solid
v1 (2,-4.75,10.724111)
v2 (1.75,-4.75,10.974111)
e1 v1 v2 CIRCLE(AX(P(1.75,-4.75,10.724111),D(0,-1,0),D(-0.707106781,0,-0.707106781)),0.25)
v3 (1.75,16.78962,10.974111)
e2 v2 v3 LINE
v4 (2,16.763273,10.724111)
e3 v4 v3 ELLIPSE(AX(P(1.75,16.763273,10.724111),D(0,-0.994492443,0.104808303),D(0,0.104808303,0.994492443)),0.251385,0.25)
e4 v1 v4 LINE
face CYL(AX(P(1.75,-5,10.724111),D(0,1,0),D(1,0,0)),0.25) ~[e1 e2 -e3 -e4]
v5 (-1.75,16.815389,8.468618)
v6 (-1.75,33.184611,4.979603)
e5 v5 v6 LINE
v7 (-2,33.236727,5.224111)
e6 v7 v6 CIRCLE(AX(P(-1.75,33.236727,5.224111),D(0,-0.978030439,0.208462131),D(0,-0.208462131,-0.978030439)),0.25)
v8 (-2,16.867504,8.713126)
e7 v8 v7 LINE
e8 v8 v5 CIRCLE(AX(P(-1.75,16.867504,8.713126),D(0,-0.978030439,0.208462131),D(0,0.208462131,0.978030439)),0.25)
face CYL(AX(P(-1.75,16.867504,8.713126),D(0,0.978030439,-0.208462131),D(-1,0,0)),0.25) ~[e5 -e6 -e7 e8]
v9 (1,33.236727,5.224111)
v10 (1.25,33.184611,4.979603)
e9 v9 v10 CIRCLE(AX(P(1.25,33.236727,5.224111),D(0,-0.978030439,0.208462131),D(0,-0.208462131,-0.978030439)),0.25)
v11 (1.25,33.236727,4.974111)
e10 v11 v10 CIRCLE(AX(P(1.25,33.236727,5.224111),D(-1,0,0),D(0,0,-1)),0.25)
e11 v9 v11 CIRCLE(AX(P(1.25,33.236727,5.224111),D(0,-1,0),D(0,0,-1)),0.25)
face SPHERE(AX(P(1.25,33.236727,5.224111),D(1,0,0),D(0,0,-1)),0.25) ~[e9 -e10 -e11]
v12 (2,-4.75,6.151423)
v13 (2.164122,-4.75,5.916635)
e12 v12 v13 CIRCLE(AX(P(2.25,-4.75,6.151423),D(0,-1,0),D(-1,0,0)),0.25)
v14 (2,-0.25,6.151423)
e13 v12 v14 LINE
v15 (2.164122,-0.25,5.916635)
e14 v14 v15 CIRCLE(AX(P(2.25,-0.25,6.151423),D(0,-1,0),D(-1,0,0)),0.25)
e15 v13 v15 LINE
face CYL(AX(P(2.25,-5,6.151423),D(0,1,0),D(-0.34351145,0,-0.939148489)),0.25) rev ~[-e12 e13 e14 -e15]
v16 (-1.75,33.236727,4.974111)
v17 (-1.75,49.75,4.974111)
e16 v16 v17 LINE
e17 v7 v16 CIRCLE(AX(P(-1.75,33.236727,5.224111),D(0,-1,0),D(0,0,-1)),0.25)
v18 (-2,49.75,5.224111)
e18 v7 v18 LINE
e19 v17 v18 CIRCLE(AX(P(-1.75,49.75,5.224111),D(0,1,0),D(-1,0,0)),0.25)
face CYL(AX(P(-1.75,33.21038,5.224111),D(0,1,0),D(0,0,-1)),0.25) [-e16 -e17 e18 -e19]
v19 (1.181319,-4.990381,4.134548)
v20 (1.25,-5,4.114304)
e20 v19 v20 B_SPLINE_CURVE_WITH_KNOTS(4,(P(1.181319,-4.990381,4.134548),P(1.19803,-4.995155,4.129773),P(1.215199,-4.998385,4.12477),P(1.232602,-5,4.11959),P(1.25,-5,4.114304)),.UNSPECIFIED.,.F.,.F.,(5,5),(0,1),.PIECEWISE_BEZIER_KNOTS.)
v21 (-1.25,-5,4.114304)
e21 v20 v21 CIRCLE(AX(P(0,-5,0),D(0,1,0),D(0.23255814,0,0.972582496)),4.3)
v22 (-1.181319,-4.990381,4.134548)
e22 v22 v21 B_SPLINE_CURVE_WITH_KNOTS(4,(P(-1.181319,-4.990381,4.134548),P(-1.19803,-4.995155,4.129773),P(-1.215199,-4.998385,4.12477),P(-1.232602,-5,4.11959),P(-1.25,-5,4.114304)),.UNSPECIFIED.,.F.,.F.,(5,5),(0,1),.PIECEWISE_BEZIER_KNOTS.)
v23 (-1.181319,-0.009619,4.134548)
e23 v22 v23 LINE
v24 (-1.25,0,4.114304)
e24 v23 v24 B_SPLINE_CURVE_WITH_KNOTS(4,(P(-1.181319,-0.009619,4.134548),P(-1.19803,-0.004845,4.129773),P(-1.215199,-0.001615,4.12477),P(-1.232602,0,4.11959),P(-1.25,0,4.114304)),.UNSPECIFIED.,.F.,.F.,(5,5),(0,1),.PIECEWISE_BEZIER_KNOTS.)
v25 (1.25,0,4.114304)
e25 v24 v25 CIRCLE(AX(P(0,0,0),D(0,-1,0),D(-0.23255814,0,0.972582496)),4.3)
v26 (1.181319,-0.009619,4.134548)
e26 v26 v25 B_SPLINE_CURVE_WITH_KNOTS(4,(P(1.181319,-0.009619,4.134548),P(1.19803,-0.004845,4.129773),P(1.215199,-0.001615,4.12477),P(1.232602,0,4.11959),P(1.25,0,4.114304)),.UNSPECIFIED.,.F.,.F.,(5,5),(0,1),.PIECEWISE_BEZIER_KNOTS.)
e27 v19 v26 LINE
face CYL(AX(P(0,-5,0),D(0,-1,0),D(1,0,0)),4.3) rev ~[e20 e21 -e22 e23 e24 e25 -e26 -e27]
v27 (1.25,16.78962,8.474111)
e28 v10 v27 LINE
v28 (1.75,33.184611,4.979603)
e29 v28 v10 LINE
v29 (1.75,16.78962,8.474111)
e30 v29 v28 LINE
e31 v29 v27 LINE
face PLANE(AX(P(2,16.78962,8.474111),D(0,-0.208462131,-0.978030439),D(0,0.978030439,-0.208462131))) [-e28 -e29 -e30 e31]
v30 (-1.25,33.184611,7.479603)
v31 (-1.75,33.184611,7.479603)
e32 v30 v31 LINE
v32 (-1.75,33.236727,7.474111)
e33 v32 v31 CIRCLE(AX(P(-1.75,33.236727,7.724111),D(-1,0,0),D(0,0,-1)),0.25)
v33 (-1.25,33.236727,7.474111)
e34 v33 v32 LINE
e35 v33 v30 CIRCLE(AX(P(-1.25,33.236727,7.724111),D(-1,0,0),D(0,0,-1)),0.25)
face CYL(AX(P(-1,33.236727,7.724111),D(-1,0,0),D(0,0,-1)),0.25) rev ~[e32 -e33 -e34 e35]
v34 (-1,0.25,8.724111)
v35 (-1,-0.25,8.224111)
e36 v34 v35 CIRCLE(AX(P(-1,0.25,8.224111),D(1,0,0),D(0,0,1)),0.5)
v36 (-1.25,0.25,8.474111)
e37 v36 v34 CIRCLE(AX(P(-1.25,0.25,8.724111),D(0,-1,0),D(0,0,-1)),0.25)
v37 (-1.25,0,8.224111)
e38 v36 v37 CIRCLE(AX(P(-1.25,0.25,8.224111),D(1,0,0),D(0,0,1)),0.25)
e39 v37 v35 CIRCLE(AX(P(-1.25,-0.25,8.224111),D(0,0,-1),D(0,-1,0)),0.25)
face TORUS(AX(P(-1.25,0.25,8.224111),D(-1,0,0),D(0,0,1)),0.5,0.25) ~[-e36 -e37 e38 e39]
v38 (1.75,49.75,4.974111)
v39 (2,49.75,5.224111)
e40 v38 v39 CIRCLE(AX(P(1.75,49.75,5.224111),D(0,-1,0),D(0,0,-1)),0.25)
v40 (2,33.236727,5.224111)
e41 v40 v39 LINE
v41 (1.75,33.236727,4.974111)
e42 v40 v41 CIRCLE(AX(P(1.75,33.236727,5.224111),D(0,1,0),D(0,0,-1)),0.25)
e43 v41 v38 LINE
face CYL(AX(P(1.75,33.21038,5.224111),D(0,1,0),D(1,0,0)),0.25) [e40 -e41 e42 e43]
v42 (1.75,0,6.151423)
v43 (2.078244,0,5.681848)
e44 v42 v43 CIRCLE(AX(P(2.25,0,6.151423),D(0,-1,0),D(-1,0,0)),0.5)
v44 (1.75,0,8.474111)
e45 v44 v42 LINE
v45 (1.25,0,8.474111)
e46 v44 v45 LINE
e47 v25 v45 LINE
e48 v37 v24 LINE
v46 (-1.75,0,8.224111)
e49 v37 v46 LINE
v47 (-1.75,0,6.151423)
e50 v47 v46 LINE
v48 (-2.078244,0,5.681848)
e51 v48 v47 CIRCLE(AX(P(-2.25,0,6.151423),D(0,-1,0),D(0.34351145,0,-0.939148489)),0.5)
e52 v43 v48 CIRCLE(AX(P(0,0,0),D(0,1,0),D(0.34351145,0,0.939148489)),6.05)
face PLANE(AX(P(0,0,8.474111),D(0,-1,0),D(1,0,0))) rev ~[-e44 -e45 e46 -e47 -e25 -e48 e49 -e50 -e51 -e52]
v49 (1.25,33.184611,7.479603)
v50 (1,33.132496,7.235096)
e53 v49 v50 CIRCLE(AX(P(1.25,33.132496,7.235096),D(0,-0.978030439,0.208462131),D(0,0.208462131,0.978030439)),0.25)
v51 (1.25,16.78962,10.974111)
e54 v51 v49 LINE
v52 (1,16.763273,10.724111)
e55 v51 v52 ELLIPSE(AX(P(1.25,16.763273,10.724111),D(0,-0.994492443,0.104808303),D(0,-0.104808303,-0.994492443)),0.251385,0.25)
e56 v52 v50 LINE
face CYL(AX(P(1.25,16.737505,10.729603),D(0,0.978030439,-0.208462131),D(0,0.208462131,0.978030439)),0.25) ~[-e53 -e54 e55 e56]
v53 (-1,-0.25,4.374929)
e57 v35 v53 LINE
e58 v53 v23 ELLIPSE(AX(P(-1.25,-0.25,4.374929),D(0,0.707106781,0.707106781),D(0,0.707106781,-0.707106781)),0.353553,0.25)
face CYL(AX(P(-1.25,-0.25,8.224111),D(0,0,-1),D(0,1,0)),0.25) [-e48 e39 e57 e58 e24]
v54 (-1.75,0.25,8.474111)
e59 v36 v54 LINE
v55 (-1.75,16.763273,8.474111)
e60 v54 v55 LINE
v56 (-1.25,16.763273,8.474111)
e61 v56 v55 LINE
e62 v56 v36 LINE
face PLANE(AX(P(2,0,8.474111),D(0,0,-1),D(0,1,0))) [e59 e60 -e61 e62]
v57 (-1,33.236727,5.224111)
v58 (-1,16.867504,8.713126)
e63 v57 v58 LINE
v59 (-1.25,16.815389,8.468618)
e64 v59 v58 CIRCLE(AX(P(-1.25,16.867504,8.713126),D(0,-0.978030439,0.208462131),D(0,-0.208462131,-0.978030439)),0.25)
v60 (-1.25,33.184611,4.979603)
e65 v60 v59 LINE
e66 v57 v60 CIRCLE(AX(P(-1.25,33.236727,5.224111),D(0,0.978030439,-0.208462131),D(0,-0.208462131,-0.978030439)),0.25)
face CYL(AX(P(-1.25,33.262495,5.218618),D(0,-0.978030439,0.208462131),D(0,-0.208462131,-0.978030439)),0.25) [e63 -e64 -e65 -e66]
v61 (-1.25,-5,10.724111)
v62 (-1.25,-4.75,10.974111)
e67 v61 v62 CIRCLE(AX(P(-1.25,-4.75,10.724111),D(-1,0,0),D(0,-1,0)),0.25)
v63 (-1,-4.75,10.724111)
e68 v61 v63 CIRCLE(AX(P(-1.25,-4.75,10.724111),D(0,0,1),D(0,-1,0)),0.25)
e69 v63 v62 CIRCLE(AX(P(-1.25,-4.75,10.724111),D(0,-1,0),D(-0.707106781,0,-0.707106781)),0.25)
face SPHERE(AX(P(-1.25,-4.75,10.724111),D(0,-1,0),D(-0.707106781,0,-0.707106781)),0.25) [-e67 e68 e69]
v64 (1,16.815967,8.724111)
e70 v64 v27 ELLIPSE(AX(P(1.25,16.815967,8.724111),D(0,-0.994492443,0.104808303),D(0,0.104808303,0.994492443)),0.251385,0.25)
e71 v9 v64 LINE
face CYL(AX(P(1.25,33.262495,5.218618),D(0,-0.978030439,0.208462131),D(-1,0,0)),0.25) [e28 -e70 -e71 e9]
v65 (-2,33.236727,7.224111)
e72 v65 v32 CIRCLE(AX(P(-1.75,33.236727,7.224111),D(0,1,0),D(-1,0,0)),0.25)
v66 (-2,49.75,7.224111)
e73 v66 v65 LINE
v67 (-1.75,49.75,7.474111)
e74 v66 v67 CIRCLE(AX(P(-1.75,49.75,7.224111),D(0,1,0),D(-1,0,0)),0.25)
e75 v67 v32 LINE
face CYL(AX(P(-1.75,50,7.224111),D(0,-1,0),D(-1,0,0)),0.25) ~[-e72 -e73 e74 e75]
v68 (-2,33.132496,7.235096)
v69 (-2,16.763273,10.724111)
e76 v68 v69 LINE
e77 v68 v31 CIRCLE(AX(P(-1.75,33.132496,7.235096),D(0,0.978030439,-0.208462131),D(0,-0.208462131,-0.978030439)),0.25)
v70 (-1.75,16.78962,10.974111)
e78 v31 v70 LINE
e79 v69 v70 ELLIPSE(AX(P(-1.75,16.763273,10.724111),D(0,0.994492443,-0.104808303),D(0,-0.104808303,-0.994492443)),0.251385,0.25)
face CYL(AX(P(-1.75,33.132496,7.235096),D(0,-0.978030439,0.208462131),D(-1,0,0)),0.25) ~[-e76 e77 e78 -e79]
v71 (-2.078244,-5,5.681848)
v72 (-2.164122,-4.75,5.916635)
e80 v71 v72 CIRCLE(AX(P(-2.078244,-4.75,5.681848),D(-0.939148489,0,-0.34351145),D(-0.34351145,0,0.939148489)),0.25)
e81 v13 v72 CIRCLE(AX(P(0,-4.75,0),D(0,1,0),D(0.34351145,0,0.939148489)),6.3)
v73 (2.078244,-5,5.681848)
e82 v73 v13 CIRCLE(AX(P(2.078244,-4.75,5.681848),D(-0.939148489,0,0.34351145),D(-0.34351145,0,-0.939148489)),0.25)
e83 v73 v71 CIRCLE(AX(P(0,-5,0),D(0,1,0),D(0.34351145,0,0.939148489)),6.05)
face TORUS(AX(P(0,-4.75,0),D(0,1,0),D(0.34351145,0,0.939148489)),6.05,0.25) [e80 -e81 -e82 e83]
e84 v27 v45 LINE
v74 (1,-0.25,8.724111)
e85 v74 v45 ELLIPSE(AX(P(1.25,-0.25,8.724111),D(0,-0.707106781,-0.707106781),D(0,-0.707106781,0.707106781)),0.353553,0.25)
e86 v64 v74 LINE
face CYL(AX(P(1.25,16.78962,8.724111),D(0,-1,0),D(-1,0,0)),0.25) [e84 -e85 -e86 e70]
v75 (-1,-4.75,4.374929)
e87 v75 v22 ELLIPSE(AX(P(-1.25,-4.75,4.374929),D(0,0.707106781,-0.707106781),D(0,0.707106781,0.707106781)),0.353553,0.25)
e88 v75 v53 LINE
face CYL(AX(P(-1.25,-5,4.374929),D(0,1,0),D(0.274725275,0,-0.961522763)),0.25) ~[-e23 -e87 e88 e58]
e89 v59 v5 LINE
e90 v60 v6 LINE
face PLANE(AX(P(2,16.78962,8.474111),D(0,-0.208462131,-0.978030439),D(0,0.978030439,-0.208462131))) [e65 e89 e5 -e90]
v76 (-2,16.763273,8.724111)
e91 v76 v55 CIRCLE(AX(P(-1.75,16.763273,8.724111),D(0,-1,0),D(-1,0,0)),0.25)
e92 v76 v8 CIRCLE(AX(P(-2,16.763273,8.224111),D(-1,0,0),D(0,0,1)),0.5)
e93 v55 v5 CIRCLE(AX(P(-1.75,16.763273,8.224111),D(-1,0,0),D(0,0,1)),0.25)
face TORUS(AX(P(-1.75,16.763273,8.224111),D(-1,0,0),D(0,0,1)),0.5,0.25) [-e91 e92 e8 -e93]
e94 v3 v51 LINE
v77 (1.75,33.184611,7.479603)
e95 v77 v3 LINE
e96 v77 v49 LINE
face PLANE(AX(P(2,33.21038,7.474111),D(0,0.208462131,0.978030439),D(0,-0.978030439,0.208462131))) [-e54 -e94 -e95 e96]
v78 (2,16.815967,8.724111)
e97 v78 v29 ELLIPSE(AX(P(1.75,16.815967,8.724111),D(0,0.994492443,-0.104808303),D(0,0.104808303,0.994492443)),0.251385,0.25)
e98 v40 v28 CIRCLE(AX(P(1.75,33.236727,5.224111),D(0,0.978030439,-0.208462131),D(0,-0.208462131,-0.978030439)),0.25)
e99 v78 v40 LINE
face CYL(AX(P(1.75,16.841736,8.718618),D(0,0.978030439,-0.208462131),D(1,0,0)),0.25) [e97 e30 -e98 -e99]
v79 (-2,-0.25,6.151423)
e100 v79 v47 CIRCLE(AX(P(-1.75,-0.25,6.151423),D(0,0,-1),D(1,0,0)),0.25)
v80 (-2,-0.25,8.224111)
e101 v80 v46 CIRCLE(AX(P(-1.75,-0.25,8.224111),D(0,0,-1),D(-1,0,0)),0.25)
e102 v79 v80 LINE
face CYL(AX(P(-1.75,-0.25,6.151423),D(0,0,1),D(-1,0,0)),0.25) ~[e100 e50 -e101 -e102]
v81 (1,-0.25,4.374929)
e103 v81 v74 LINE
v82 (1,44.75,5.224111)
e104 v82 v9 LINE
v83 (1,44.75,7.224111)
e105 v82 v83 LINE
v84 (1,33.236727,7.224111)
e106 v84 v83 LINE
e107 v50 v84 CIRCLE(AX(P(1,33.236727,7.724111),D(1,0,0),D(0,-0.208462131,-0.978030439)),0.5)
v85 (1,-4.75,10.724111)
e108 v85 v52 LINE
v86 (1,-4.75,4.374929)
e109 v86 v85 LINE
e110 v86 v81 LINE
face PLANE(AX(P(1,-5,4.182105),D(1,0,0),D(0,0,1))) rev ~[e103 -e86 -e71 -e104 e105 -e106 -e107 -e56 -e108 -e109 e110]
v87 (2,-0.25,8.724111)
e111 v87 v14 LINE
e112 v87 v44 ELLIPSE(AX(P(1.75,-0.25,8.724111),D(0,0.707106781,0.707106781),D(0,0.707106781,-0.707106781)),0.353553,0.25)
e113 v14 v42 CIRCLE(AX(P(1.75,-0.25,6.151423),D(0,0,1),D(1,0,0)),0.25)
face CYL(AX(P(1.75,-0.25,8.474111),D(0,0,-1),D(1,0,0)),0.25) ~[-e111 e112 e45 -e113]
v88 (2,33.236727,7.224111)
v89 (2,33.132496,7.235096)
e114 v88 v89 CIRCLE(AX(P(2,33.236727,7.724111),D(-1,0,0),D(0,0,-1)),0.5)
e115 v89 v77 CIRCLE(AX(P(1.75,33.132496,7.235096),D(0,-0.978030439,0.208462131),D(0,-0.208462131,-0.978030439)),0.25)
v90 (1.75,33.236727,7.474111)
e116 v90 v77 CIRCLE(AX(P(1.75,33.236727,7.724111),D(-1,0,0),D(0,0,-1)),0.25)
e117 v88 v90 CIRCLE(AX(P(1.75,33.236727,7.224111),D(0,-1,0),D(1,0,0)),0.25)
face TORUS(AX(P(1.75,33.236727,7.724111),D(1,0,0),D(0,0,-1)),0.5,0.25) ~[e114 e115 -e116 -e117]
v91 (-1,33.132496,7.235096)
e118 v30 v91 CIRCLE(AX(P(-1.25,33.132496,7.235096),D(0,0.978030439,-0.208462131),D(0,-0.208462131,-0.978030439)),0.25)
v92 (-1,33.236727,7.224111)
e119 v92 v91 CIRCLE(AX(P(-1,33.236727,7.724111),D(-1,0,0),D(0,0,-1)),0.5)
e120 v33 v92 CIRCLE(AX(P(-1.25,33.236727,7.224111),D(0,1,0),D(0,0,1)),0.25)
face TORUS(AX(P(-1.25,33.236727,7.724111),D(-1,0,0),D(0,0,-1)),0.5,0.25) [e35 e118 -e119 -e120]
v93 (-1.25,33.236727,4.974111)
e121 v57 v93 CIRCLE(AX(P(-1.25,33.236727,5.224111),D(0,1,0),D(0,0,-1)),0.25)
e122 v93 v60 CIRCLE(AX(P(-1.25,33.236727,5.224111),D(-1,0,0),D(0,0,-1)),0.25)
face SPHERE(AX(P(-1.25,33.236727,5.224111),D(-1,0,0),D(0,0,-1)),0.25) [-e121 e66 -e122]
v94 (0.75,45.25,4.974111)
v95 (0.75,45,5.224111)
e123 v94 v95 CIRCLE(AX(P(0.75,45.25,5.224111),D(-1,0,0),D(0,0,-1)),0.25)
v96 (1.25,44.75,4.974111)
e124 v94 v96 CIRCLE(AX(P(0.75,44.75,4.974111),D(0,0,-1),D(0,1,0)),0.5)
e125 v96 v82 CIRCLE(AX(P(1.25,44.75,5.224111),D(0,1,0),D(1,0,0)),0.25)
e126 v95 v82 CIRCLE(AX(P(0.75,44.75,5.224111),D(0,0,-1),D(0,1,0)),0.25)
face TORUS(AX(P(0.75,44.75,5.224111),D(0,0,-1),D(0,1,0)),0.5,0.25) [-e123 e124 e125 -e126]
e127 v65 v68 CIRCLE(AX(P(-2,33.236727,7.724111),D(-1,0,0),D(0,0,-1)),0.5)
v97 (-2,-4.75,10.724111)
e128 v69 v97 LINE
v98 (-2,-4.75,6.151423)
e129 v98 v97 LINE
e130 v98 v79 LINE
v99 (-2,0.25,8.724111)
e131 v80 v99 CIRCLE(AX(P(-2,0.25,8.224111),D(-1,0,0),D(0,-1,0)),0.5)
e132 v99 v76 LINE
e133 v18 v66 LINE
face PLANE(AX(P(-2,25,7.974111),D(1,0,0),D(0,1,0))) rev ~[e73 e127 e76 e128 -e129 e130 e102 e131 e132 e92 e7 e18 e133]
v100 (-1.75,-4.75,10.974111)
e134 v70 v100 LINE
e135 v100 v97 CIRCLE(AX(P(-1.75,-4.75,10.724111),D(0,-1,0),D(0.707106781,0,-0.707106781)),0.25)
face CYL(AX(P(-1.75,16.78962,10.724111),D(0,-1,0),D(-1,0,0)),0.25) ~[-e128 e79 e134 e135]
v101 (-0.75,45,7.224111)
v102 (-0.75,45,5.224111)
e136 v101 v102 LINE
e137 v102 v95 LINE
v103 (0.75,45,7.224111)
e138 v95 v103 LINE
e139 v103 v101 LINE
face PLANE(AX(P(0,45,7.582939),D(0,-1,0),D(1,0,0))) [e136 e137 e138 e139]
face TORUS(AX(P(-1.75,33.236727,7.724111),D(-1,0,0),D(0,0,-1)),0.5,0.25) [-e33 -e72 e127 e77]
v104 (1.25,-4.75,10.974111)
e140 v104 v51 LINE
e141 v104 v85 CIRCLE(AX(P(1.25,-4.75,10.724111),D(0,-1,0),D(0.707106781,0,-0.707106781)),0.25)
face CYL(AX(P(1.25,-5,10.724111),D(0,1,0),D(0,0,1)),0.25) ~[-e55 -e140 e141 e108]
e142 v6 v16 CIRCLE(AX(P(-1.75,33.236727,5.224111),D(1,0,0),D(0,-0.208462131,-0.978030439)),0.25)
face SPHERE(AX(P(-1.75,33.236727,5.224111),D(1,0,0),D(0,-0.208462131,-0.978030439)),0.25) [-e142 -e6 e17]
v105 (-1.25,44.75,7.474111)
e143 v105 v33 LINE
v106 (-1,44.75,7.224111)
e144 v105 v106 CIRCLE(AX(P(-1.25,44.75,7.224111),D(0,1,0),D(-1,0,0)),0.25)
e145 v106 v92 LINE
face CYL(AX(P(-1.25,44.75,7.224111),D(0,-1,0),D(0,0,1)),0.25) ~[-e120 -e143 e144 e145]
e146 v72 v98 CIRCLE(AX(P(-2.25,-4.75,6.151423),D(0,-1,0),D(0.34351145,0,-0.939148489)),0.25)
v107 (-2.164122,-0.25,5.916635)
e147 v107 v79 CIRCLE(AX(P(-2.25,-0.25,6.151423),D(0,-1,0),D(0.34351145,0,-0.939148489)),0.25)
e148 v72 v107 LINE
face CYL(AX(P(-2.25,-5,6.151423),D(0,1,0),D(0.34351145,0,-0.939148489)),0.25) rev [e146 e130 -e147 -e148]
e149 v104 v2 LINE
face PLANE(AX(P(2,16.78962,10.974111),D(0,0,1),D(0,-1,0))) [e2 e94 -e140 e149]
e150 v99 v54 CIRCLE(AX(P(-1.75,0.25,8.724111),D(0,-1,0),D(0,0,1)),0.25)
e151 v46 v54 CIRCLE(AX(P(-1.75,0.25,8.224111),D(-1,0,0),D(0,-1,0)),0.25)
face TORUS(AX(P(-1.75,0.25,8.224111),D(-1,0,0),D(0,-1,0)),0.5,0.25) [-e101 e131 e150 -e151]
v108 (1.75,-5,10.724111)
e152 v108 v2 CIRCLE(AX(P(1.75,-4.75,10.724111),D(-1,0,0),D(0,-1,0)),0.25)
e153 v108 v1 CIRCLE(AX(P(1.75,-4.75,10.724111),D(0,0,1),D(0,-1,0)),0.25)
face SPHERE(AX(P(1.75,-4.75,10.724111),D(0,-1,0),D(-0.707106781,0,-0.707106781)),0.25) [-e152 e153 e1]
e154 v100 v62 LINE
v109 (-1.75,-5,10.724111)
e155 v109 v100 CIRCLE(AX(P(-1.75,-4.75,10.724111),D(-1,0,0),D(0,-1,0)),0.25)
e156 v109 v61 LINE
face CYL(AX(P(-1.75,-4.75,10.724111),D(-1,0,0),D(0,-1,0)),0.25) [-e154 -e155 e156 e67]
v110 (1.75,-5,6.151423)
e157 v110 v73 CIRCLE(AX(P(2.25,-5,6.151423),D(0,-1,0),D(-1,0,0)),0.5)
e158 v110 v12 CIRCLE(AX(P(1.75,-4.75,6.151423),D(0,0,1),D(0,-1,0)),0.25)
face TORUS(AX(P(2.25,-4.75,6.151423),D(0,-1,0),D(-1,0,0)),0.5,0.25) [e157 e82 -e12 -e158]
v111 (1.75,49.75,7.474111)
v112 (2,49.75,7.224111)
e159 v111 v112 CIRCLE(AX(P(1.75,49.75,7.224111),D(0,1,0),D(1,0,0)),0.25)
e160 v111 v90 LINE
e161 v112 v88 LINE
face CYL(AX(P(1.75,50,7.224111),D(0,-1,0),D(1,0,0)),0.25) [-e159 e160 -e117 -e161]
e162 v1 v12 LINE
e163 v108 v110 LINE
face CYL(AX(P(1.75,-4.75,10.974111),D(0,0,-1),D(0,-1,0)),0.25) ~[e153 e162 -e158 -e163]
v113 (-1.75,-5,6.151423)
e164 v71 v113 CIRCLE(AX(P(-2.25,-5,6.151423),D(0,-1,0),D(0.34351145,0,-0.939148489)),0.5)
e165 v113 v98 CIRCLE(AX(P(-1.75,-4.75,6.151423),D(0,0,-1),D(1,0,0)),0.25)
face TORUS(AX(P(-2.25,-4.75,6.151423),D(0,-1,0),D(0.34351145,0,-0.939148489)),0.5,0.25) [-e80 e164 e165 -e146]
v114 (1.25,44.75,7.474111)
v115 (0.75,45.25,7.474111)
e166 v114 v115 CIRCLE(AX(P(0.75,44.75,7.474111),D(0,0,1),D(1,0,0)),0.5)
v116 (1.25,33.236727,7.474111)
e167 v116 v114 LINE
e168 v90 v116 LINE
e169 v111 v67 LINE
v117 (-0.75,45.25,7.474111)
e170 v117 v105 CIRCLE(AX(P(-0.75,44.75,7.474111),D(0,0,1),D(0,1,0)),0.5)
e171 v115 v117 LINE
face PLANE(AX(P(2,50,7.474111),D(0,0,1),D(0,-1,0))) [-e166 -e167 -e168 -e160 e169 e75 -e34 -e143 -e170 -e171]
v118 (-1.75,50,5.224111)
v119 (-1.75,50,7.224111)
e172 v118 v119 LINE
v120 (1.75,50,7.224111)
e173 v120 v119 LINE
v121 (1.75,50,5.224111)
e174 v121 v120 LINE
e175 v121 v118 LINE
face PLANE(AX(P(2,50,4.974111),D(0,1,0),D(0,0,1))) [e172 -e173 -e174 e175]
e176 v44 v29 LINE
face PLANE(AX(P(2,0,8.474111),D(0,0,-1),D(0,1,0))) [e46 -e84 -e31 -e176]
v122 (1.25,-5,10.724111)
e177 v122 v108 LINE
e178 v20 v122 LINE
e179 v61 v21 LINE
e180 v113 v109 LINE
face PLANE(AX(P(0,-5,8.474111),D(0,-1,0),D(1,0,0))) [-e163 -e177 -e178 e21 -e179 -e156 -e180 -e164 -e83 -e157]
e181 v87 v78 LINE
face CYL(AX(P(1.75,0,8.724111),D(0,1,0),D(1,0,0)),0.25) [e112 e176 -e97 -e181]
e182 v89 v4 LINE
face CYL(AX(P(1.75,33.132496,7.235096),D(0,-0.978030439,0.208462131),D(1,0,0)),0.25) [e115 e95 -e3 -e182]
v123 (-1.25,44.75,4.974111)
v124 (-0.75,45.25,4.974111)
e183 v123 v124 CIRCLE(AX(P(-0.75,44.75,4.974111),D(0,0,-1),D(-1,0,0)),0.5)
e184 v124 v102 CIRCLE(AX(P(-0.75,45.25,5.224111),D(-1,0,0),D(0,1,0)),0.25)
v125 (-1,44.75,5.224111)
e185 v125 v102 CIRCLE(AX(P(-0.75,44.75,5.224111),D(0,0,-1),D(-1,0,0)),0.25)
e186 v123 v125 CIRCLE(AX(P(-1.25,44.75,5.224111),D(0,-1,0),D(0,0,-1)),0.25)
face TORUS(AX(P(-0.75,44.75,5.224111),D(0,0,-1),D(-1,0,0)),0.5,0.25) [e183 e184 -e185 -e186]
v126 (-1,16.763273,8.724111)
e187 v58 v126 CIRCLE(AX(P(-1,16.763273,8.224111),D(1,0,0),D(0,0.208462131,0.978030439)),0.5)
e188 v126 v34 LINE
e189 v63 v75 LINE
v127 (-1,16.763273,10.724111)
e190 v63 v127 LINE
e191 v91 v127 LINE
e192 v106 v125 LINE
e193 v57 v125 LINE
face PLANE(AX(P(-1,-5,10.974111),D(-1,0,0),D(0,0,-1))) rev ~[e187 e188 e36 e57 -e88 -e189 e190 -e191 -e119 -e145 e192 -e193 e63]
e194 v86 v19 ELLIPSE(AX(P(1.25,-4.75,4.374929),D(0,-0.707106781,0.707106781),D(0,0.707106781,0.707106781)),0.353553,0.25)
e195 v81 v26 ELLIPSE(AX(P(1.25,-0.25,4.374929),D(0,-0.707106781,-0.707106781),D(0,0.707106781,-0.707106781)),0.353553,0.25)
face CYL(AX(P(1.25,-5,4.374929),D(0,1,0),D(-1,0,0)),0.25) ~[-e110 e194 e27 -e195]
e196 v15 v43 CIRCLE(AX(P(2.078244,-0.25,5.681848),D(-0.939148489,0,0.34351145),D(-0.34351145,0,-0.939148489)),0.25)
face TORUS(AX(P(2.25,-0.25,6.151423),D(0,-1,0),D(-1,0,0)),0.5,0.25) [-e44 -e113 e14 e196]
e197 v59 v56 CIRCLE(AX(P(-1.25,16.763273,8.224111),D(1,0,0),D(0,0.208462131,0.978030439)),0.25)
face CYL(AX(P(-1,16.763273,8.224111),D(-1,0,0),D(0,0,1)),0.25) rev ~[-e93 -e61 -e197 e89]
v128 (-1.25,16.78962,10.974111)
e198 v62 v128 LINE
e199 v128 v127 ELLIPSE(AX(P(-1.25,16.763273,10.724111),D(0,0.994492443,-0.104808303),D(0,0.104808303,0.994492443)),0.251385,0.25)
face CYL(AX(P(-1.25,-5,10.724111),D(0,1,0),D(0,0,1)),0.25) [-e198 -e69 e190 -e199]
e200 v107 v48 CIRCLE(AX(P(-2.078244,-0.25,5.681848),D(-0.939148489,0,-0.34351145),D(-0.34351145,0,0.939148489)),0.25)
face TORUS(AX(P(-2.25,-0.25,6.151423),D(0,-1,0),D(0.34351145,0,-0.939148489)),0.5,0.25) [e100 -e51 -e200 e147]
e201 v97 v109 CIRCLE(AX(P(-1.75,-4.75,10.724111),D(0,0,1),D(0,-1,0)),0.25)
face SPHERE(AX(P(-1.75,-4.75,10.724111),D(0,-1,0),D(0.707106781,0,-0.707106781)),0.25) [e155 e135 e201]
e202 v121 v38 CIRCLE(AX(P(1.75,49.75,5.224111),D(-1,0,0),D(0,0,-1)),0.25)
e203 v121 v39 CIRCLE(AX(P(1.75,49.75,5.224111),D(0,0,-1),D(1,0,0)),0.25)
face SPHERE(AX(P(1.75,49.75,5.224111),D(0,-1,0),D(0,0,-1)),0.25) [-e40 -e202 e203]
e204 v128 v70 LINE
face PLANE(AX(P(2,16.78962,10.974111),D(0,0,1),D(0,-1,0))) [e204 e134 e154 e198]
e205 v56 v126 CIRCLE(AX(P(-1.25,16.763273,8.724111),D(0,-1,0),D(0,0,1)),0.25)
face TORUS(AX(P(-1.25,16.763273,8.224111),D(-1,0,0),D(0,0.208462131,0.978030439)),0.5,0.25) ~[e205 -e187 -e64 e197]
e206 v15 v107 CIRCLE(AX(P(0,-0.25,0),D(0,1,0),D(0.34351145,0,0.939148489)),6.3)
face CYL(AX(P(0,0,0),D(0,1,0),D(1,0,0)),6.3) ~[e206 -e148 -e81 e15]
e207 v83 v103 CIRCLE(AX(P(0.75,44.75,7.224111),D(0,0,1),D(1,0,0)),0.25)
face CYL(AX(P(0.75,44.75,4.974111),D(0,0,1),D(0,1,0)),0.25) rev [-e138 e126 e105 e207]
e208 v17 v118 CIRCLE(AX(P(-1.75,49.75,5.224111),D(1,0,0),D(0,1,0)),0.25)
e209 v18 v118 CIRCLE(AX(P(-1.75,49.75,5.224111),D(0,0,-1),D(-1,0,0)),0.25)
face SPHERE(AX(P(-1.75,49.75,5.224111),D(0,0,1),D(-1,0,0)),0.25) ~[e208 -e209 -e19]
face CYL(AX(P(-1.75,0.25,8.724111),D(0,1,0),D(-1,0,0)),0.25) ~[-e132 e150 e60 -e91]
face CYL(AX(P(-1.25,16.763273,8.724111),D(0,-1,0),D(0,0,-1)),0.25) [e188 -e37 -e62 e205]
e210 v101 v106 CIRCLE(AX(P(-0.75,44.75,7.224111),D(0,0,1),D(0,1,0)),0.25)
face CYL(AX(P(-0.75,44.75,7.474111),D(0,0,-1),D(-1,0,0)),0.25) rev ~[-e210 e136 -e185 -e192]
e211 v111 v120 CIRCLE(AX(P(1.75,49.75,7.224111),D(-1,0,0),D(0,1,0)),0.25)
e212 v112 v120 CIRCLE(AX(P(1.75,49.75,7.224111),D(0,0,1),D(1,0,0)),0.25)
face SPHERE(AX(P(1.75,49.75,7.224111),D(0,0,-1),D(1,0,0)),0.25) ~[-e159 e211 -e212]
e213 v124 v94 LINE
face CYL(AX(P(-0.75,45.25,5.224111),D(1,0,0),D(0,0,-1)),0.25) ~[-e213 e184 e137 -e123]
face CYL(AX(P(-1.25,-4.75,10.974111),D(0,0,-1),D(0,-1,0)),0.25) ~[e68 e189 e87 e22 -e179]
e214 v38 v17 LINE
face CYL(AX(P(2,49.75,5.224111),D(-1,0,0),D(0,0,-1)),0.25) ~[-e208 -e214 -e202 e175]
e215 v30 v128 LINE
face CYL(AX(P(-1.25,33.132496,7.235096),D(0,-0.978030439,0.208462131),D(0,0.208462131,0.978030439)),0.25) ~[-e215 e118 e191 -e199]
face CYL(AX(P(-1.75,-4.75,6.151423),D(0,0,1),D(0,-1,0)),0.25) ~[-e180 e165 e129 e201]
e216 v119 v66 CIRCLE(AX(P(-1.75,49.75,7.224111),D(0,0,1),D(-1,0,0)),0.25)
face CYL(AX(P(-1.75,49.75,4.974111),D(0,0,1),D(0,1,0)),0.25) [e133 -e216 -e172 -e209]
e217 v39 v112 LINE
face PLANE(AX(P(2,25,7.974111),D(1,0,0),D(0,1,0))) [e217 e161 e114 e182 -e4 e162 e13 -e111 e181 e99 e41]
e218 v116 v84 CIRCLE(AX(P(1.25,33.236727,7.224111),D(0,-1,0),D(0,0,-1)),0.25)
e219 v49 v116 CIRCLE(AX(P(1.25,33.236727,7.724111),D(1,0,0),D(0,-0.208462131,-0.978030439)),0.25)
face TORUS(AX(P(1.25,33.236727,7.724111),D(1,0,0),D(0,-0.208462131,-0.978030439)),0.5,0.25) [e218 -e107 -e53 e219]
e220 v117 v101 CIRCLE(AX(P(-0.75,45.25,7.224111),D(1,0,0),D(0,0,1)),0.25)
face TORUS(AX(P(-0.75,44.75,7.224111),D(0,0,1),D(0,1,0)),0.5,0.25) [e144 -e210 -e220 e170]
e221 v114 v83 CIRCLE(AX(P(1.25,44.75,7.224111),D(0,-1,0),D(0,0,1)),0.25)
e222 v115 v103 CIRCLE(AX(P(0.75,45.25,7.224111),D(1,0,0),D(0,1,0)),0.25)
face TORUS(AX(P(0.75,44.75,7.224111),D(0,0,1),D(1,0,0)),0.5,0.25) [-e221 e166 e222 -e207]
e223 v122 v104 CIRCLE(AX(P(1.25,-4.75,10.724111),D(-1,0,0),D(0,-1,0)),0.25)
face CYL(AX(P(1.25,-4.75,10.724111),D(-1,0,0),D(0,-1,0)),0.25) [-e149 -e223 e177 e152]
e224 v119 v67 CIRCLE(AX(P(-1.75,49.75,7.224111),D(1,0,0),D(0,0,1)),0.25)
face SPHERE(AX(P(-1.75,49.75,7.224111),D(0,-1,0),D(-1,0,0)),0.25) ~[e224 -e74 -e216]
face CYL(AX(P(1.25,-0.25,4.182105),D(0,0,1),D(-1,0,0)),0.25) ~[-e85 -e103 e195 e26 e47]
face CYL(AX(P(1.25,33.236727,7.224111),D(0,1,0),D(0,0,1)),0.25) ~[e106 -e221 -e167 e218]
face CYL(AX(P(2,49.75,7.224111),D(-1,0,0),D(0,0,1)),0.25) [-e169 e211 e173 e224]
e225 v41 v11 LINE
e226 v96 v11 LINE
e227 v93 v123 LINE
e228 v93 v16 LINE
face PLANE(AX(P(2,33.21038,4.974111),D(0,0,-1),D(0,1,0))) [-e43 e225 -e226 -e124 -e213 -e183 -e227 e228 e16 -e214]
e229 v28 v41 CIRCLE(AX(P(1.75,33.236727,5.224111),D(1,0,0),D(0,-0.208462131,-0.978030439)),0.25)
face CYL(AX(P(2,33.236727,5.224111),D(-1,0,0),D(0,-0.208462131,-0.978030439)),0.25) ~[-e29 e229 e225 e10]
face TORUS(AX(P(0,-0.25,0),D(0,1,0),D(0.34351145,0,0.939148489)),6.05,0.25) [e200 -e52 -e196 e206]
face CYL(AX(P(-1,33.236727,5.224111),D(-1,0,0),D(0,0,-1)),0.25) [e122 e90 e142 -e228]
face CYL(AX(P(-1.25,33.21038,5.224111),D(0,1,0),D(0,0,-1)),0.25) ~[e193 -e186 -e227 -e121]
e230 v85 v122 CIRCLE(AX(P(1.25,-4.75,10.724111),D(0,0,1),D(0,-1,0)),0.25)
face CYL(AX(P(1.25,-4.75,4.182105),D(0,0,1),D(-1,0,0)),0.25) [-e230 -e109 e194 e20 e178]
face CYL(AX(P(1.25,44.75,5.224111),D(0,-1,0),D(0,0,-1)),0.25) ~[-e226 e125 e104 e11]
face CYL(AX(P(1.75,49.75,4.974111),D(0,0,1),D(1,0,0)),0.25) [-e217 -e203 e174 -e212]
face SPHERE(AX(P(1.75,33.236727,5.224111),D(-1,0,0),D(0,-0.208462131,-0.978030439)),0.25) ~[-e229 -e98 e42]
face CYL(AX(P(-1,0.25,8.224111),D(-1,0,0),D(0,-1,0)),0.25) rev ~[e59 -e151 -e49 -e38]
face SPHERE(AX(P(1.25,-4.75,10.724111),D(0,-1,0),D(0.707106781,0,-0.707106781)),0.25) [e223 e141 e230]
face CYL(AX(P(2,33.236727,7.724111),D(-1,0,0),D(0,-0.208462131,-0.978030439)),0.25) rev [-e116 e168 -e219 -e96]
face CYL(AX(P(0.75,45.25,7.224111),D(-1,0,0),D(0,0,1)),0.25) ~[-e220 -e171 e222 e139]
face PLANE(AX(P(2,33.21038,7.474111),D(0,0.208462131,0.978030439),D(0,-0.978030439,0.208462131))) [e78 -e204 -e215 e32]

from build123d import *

# Parameters (mm, degrees)
F0_R          = 6.3
F1_DEPTH      = 5
F2_R          = 4.3
F3_DEPTH      = 5
F4_W          = 4
F4_H          = 5
F5_DEPTH      = 5
F7_DEPTH      = 4
F9_DEPTH      = 50
F10_F1_R      = 0.25
F10_F2_R      = 0.25
F11_T1_DEPTH  = 0.5
F11_T3_DEPTH  = 0.5
F11_S7_W      = 0.25
F11_S7_H      = 0.25
F11_T8_DEPTH  = 0.25
F11_S13_W     = 0.25
F11_S13_H     = 0.25
F11_T14_DEPTH = 0.25
F11_S19_W     = 0.25
F11_S19_H     = 0.25
F11_T20_DEPTH = 0.25
F11_S25_W     = 0.25
F11_S25_H     = 0.25
F11_T26_DEPTH = 0.25


# Not quite as in the source:
# - a fillet or chamfer that OpenCascade refuses, or shapes differently, is made with other operations: its cross-section is extruded or revolved along the edge and cut away or added


with BuildPart() as f1:
    # F0 (on Front) → F1 (new body)
    with BuildSketch(Plane.XZ):
        Circle(F0_R)
    extrude(amount=F1_DEPTH)

    # F2 (on face) → F3 (cut, through all)
    with BuildSketch(Plane.XZ.offset(5)):
        Circle(F2_R)
    extrude(amount=-F3_DEPTH, mode=Mode.SUBTRACT)

    # F4 (on face) → F5 (join)
    with BuildSketch(Plane.XZ.offset(5)):
        with Locations((0, 8.4741108125)):
            Rectangle(F4_W, F4_H)
    extrude(amount=-F5_DEPTH)

    # F6 (on face) → F7 (join, through all)
    with BuildSketch(Plane.YZ.offset(2)):
        Polygon((16.7896201938, 10.9741108125), (0, 10.9741108125), (0, 8.4741108125), (16.7896201938, 8.4741108125), (33.2103798062, 4.9741108125), (50, 4.9741108125), (50, 7.4741108125), (33.2103798062, 7.4741108125), align=None)
    extrude(amount=-F7_DEPTH)

    # F8 (on face) → F9 (cut)
    with BuildSketch(Plane.XZ.offset(5)):
        with BuildLine():
            Line((1, 4.1821047333), (1, 10.9741108125))
            Line((1, 10.9741108125), (-1, 10.9741108125))
            Line((-1, 10.9741108125), (-1, 4.1821047333))
            ThreePointArc((-1, 4.1821047333), (0, 4.3), (1, 4.1821047333))
        make_face()
    extrude(amount=-F9_DEPTH, mode=Mode.SUBTRACT)

    # F10: fillet of radius 0.25 on 50 edges, made by hand

    # F10_f1
    f10_f1_edges = [f1.edges().sort_by_distance(p)[0] for p in [
        (-1.5, 0, 8.4741108125),
        (-1.5, 16.7896201938, 8.4741108125),
        (-2, -2.5, 5.9741108125),
        (-1, 45, 6.2241108125),
        (1, 45, 6.2241108125),
        (2, -2.5, 5.9741108125),
        (1.5, 33.2103798062, 7.4741108125),
        (-1.5, 33.2103798062, 7.4741108125),
    ]]
    fillet(f10_f1_edges, radius=F10_F1_R)

    # F10_f2
    f10_f2_edges = [f1.edges().sort_by_distance(p)[0] for p in [
        (-2, 8.5066365047, 8.4741108125),
        (-2, 0, 7.1877667061),
        (-1, 0, 6.2031077729),
        (-1, 8.5066365047, 8.4741108125),
        (-2, 5.8948100969, 10.9741108125),
        (-2, 24.9871158258, 9.2268570076),
        (-2, 41.6183634953, 7.4741108125),
        (-2, 50, 6.2241108125),
        (-2, 41.6051899031, 4.9741108125),
        (-2, 25.0128841742, 6.7213646174),
        (-2, -5, 8.5627667061),
        (-1, 25.0128841742, 6.7213646174),
        (-1.5, 33.2103798062, 4.9741108125),
        (-1, -5, 7.5781077729),
        (-1, -2.5, 4.1821047333),
        (-1, 38.9801899031, 4.9741108125),
        (-1, 38.9933634953, 7.4741108125),
        (-1, 24.9871158258, 9.2268570076),
        (-1, 5.8948100969, 10.9741108125),
        (1, -5, 7.5781077729),
        (1, 5.8948100969, 10.9741108125),
        (1, 24.9871158258, 9.2268570076),
        (1, 38.9933634953, 7.4741108125),
        (1, 38.9801899031, 4.9741108125),
        (1, 25, 6.7241108125),
        (1, 8.3948100969, 8.4741108125),
        (1, 0, 6.3281077729),
        (1, -2.5, 4.1821047333),
        (2, 41.6051899031, 4.9741108125),
        (0, 50, 4.9741108125),
        (0, 45, 4.9741108125),
        (1.5, 33.2103798062, 4.9741108125),
        (2, 0, 7.3127667061),
        (2, 8.3948100969, 8.4741108125),
        (2, 25, 6.7241108125),
        (2, 50, 6.2241108125),
        (2, 41.6183634953, 7.4741108125),
        (2, 24.9871158258, 9.2268570076),
        (2, 5.8948100969, 10.9741108125),
        (2, -5, 8.5627667061),
        (0, 45, 7.4741108125),
        (0, 50, 7.4741108125),
        (-0.9267766953, 44.9267766953, 7.4741108125),
        (0.9267766953, 44.9267766953, 7.4741108125),
        (2.0450982362, -5, 6.0081910837),
        (2, 33.2105249149, 7.4754877017),
        (2.0450982362, 0, 6.0081910837),
        (0.9267766953, 44.9267766953, 4.9741108125),
        (-0.9267766953, 44.9267766953, 4.9741108125),
        (1, 33.2105249149, 7.4754877017),
        (-1, 33.2105249149, 7.4754877017),
        (-1, 16.7894750851, 8.4727339233),
        (-2.0450982362, -5, 6.0081910837),
        (-2, 16.7894750851, 8.4727339233),
        (-2, 33.2105249149, 7.4754877017),
        (-1, 0.0732233047, 8.4008875078),
        (-2, 0.0732233047, 8.4008875078),
        (-2.0450982362, 0, 6.0081910837),
    ]]
    fillet(f10_f2_edges, radius=F10_F2_R)

    # F11: fillet of radius 0.25 on 2 edges, made by hand

    # F11_s2 → F11_t1 (cut)
    with BuildSketch(Plane.YZ.offset(1.25)):
        with BuildLine():
            ThreePointArc((-5, 10.7241108125), (-4.9267766953, 10.9008875078), (-4.75, 10.9741108125))
            Line((-4.75, 10.9741108125), (-5, 10.9741108125))
            Line((-5, 10.9741108125), (-5, 10.7241108125))
        make_face()
    extrude(amount=F11_T1_DEPTH, mode=Mode.SUBTRACT)

    # F11_s4 → F11_t3 (cut)
    with BuildSketch(Plane.YZ.offset(-1.75)):
        with BuildLine():
            ThreePointArc((-5, 10.7241108125), (-4.9267766953, 10.9008875078), (-4.75, 10.9741108125))
            Line((-4.75, 10.9741108125), (-5, 10.9741108125))
            Line((-5, 10.9741108125), (-5, 10.7241108125))
        make_face()
    extrude(amount=F11_T3_DEPTH, mode=Mode.SUBTRACT)


with BuildPart() as f11_tool6:
    # F11_s7 → F11_t8 (new body)
    with BuildSketch(Plane.XZ.offset(4.75)):
        with Locations((-1.125, 10.8491108125)):
            Rectangle(F11_S7_W, F11_S7_H)
    extrude(amount=F11_T8_DEPTH)

    # F11_s9 → F11_t10 (revolve, cut)
    with BuildSketch(Plane(origin=(-1.25, -4.75, 10.7241108125), x_dir=(-0.7071067812, 0, -0.7071067812), z_dir=(-0.7071067812, 0, 0.7071067812))):
        with BuildLine():
            ThreePointArc((0, -0.25), (0.25, 0), (0, 0.25))
            Line((0, 0.25), (0, -0.25))
        make_face()
    revolve(axis=Axis((-1.25, -4.75, 10.7241108125), (0, -1, 0)), mode=Mode.SUBTRACT)


with BuildPart() as f1_1:
    add(f1.part)

    # F11_t5: cut F11_tool6
    add(f11_tool6.part, mode=Mode.SUBTRACT)


with BuildPart() as f11_tool12:
    # F11_s13 → F11_t14 (new body)
    with BuildSketch(Plane.XZ.offset(4.75)):
        with Locations((-1.875, 10.8491108125)):
            Rectangle(F11_S13_W, F11_S13_H)
    extrude(amount=F11_T14_DEPTH)

    # F11_s15 → F11_t16 (revolve, cut)
    with BuildSketch(Plane(origin=(-1.75, -4.75, 10.7241108125), x_dir=(0.7071067812, 0, -0.7071067812), z_dir=(-0.7071067812, 0, -0.7071067812))):
        with BuildLine():
            ThreePointArc((0, -0.25), (0.25, 0), (0, 0.25))
            Line((0, 0.25), (0, -0.25))
        make_face()
    revolve(axis=Axis((-1.75, -4.75, 10.7241108125), (0, -1, 0)), mode=Mode.SUBTRACT)


with BuildPart() as f1_2:
    add(f1_1.part)

    # F11_t11: cut F11_tool12
    add(f11_tool12.part, mode=Mode.SUBTRACT)


with BuildPart() as f11_tool18:
    # F11_s19 → F11_t20 (new body)
    with BuildSketch(Plane.XZ.offset(4.75)):
        with Locations((1.875, 10.8491108125)):
            Rectangle(F11_S19_W, F11_S19_H)
    extrude(amount=F11_T20_DEPTH)

    # F11_s21 → F11_t22 (revolve, cut)
    with BuildSketch(Plane(origin=(1.75, -4.75, 10.7241108125), x_dir=(-0.7071067812, 0, -0.7071067812), z_dir=(-0.7071067812, 0, 0.7071067812))):
        with BuildLine():
            ThreePointArc((0, -0.25), (0.25, 0), (0, 0.25))
            Line((0, 0.25), (0, -0.25))
        make_face()
    revolve(axis=Axis((1.75, -4.75, 10.7241108125), (0, -1, 0)), mode=Mode.SUBTRACT)


with BuildPart() as f1_3:
    add(f1_2.part)

    # F11_t17: cut F11_tool18
    add(f11_tool18.part, mode=Mode.SUBTRACT)


with BuildPart() as f11_tool24:
    # F11_s25 → F11_t26 (new body)
    with BuildSketch(Plane.XZ.offset(4.75)):
        with Locations((1.125, 10.8491108125)):
            Rectangle(F11_S25_W, F11_S25_H)
    extrude(amount=F11_T26_DEPTH)

    # F11_s27 → F11_t28 (revolve, cut)
    with BuildSketch(Plane(origin=(1.25, -4.75, 10.7241108125), x_dir=(0.7071067812, 0, -0.7071067812), z_dir=(-0.7071067812, 0, -0.7071067812))):
        with BuildLine():
            ThreePointArc((0, -0.25), (0.25, 0), (0, 0.25))
            Line((0, 0.25), (0, -0.25))
        make_face()
    revolve(axis=Axis((1.25, -4.75, 10.7241108125), (0, -1, 0)), mode=Mode.SUBTRACT)


with BuildPart() as f1_4:
    add(f1_3.part)

    # F11_t23: cut F11_tool24
    add(f11_tool24.part, mode=Mode.SUBTRACT)


solid = f1_4.part
